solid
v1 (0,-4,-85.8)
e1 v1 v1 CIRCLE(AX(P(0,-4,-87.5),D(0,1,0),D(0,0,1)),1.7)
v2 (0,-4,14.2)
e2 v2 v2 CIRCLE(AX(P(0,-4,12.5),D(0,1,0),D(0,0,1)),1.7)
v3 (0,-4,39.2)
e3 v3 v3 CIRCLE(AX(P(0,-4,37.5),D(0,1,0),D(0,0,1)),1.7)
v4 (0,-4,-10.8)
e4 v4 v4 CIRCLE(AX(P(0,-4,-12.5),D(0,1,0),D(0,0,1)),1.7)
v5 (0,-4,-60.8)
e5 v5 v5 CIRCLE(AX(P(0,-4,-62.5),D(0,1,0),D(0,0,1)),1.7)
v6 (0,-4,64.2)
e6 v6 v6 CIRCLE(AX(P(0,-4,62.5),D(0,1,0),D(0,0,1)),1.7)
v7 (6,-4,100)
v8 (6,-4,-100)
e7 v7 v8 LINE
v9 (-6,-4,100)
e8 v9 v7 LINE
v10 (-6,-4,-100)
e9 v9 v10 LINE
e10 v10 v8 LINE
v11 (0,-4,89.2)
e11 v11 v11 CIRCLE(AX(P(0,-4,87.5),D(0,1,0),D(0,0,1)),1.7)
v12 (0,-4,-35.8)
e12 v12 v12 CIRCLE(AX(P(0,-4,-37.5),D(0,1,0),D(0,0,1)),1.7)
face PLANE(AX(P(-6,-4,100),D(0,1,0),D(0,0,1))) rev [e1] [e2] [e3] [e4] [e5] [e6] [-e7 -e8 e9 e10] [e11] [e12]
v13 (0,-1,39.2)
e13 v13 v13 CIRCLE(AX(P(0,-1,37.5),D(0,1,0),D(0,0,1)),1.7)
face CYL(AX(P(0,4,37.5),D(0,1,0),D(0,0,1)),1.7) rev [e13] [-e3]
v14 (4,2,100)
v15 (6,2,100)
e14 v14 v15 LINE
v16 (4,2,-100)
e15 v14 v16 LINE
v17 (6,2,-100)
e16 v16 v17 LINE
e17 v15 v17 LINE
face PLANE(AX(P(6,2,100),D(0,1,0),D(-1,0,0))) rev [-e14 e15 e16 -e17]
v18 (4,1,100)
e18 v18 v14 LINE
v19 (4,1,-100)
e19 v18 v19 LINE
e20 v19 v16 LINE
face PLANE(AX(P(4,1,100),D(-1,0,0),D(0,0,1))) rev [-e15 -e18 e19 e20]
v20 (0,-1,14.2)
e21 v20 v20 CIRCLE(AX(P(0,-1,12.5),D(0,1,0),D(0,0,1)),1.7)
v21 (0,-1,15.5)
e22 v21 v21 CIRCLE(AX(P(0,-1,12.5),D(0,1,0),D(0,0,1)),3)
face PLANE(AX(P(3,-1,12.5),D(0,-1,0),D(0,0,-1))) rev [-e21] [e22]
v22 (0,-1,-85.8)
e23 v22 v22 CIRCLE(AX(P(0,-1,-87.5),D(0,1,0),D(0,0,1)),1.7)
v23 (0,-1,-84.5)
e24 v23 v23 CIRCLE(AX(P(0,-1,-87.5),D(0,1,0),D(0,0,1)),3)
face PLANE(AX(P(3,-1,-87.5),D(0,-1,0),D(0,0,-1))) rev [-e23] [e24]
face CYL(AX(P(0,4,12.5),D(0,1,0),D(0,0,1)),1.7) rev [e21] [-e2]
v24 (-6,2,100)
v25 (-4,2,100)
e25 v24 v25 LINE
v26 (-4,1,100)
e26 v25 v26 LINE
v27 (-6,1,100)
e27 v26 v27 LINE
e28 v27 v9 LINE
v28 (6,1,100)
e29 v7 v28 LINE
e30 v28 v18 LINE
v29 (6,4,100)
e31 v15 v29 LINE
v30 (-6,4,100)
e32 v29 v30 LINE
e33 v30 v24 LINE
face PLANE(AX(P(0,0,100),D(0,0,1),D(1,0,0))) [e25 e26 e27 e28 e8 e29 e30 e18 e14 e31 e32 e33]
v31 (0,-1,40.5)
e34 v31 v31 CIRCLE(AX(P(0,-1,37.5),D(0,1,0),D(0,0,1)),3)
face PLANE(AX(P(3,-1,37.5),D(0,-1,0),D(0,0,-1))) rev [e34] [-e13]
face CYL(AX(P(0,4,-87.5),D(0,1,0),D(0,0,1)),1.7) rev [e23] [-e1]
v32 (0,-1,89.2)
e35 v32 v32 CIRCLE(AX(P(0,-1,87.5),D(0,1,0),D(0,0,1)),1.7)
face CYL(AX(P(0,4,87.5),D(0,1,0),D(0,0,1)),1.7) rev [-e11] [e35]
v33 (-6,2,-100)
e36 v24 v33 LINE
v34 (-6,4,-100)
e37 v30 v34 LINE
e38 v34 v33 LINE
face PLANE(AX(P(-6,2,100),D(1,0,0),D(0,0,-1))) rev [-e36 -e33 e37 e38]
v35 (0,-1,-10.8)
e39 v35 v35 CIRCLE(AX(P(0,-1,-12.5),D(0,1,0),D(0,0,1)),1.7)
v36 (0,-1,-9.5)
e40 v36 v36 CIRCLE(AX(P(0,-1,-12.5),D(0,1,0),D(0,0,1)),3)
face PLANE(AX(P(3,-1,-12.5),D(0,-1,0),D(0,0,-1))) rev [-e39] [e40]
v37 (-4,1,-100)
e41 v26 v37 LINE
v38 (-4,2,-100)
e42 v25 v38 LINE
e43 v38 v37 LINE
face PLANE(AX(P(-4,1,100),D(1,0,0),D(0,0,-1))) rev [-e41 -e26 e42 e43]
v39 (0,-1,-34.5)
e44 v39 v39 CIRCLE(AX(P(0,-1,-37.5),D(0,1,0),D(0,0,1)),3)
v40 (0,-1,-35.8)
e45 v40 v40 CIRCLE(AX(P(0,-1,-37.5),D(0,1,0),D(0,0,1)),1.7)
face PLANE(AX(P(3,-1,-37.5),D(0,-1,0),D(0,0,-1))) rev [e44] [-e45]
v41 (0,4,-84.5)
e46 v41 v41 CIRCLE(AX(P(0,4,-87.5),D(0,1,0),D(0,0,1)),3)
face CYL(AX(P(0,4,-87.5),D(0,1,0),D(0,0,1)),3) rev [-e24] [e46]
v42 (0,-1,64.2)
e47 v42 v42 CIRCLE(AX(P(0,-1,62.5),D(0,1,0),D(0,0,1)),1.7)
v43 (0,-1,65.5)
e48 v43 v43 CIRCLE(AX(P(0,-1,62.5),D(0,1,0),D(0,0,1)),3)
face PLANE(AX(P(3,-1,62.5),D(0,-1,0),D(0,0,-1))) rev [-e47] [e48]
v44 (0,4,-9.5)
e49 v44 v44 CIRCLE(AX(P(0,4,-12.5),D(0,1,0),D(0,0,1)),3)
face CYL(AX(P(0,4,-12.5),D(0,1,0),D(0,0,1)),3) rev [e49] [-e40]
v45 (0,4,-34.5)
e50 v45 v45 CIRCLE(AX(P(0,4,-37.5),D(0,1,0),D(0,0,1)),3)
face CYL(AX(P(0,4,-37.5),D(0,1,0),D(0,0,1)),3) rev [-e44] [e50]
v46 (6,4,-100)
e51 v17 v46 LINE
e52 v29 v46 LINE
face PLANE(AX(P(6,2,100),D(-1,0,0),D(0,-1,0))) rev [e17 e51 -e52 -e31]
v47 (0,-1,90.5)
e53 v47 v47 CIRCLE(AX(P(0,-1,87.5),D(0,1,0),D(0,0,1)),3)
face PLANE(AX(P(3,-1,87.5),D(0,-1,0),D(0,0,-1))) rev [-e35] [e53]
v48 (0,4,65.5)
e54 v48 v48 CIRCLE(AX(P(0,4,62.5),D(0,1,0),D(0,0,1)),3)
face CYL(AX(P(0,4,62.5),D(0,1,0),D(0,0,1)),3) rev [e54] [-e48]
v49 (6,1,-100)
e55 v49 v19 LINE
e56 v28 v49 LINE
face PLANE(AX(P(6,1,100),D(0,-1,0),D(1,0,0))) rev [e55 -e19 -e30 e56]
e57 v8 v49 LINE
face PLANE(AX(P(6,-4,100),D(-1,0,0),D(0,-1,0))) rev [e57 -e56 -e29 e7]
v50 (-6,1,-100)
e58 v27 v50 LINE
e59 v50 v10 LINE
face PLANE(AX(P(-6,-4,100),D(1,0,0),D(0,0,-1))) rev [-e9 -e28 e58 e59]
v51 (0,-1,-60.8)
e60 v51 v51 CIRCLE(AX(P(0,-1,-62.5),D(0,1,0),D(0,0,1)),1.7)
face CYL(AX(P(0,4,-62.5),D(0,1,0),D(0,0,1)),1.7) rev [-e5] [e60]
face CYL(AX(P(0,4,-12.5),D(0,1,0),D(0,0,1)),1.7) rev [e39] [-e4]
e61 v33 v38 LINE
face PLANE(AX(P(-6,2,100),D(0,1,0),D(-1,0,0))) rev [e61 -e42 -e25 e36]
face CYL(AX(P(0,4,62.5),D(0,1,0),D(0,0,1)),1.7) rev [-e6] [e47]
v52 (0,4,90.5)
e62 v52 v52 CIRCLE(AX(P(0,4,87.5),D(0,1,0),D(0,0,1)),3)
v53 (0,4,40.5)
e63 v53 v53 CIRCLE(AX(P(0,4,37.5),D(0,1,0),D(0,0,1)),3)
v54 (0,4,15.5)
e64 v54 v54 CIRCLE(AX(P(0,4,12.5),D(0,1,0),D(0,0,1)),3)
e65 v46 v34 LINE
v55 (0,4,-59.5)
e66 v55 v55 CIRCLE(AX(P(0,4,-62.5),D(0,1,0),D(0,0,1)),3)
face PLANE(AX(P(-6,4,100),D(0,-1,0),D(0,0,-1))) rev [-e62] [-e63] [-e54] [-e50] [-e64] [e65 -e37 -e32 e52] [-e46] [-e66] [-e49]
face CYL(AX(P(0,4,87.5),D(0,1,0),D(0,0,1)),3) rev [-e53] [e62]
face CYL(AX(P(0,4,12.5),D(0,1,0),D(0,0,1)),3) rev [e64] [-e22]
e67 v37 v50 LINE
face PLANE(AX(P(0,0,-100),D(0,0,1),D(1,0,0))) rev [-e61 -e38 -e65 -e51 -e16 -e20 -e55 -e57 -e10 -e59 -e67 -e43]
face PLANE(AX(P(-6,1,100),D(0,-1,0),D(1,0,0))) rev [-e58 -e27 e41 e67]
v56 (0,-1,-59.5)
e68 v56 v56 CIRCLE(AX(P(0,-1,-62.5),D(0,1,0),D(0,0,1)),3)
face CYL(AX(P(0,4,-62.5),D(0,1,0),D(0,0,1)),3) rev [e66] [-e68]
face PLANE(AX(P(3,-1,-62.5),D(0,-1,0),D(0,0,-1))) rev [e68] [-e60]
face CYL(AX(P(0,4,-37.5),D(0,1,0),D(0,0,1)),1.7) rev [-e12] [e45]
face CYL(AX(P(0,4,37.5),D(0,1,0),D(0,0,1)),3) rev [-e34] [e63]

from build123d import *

# Parameters (mm, degrees)
BOSS_EXTRU_1_DEPTH         = 100
PER_AGEAVANC_1_START       = -1
PER_AGEAVANC_1_OUTLINE_R   = 3
PER_AGEAVANC_1_DEPTH       = 5
PER_AGEAVANC_1_START_2     = -4
PER_AGEAVANC_1_2_OUTLINE_R = 1.7
PER_AGEAVANC_1_2_DEPTH     = 3


# Read off the part's stored shape, not the designer's step: PerçageAvancé1
with BuildPart() as part:
    # Esquisse1 → Boss.-Extru.1 (new, symmetric)
    with BuildSketch(Plane.XY):
        Polygon((6, 2), (6, 4), (-6, 4), (-6, 2), (-4, 2), (-4, 1), (-6, 1), (-6, -4), (6, -4), (6, 1), (4, 1), (4, 2), align=None)
    extrude(amount=BOSS_EXTRU_1_DEPTH, both=True)

    # PerçageAvancé1 outline → PerçageAvancé1 (cut)
    with BuildSketch(Plane(origin=(0, 0, 0), x_dir=(1, 0, 0), z_dir=(0, 1, 0)).offset(PER_AGEAVANC_1_START)):
        with Locations((0, -87.5)):
            Circle(PER_AGEAVANC_1_OUTLINE_R)
        with Locations((0, -62.5)):
            Circle(PER_AGEAVANC_1_OUTLINE_R)
        with Locations((0, -37.5)):
            Circle(PER_AGEAVANC_1_OUTLINE_R)
        with Locations((0, -12.5)):
            Circle(PER_AGEAVANC_1_OUTLINE_R)
        with Locations((0, 12.5)):
            Circle(PER_AGEAVANC_1_OUTLINE_R)
        with Locations((0, 87.5)):
            Circle(PER_AGEAVANC_1_OUTLINE_R)
        with Locations((0, 62.5)):
            Circle(PER_AGEAVANC_1_OUTLINE_R)
        with Locations((0, 37.5)):
            Circle(PER_AGEAVANC_1_OUTLINE_R)
    extrude(amount=PER_AGEAVANC_1_DEPTH, mode=Mode.SUBTRACT)

    # Per_ageAvanc_1 2 outline → Per_ageAvanc_1 2 (cut)
    with BuildSketch(Plane(origin=(0, 0, 0), x_dir=(1, 0, 0), z_dir=(0, 1, 0)).offset(PER_AGEAVANC_1_START_2)):
        with Locations((0, -87.5)):
            Circle(PER_AGEAVANC_1_2_OUTLINE_R)
        with Locations((0, -62.5)):
            Circle(PER_AGEAVANC_1_2_OUTLINE_R)
        with Locations((0, -37.5)):
            Circle(PER_AGEAVANC_1_2_OUTLINE_R)
        with Locations((0, -12.5)):
            Circle(PER_AGEAVANC_1_2_OUTLINE_R)
        with Locations((0, 12.5)):
            Circle(PER_AGEAVANC_1_2_OUTLINE_R)
        with Locations((0, 87.5)):
            Circle(PER_AGEAVANC_1_2_OUTLINE_R)
        with Locations((0, 62.5)):
            Circle(PER_AGEAVANC_1_2_OUTLINE_R)
        with Locations((0, 37.5)):
            Circle(PER_AGEAVANC_1_2_OUTLINE_R)
    extrude(amount=PER_AGEAVANC_1_2_DEPTH, mode=Mode.SUBTRACT)


solid = part.part
